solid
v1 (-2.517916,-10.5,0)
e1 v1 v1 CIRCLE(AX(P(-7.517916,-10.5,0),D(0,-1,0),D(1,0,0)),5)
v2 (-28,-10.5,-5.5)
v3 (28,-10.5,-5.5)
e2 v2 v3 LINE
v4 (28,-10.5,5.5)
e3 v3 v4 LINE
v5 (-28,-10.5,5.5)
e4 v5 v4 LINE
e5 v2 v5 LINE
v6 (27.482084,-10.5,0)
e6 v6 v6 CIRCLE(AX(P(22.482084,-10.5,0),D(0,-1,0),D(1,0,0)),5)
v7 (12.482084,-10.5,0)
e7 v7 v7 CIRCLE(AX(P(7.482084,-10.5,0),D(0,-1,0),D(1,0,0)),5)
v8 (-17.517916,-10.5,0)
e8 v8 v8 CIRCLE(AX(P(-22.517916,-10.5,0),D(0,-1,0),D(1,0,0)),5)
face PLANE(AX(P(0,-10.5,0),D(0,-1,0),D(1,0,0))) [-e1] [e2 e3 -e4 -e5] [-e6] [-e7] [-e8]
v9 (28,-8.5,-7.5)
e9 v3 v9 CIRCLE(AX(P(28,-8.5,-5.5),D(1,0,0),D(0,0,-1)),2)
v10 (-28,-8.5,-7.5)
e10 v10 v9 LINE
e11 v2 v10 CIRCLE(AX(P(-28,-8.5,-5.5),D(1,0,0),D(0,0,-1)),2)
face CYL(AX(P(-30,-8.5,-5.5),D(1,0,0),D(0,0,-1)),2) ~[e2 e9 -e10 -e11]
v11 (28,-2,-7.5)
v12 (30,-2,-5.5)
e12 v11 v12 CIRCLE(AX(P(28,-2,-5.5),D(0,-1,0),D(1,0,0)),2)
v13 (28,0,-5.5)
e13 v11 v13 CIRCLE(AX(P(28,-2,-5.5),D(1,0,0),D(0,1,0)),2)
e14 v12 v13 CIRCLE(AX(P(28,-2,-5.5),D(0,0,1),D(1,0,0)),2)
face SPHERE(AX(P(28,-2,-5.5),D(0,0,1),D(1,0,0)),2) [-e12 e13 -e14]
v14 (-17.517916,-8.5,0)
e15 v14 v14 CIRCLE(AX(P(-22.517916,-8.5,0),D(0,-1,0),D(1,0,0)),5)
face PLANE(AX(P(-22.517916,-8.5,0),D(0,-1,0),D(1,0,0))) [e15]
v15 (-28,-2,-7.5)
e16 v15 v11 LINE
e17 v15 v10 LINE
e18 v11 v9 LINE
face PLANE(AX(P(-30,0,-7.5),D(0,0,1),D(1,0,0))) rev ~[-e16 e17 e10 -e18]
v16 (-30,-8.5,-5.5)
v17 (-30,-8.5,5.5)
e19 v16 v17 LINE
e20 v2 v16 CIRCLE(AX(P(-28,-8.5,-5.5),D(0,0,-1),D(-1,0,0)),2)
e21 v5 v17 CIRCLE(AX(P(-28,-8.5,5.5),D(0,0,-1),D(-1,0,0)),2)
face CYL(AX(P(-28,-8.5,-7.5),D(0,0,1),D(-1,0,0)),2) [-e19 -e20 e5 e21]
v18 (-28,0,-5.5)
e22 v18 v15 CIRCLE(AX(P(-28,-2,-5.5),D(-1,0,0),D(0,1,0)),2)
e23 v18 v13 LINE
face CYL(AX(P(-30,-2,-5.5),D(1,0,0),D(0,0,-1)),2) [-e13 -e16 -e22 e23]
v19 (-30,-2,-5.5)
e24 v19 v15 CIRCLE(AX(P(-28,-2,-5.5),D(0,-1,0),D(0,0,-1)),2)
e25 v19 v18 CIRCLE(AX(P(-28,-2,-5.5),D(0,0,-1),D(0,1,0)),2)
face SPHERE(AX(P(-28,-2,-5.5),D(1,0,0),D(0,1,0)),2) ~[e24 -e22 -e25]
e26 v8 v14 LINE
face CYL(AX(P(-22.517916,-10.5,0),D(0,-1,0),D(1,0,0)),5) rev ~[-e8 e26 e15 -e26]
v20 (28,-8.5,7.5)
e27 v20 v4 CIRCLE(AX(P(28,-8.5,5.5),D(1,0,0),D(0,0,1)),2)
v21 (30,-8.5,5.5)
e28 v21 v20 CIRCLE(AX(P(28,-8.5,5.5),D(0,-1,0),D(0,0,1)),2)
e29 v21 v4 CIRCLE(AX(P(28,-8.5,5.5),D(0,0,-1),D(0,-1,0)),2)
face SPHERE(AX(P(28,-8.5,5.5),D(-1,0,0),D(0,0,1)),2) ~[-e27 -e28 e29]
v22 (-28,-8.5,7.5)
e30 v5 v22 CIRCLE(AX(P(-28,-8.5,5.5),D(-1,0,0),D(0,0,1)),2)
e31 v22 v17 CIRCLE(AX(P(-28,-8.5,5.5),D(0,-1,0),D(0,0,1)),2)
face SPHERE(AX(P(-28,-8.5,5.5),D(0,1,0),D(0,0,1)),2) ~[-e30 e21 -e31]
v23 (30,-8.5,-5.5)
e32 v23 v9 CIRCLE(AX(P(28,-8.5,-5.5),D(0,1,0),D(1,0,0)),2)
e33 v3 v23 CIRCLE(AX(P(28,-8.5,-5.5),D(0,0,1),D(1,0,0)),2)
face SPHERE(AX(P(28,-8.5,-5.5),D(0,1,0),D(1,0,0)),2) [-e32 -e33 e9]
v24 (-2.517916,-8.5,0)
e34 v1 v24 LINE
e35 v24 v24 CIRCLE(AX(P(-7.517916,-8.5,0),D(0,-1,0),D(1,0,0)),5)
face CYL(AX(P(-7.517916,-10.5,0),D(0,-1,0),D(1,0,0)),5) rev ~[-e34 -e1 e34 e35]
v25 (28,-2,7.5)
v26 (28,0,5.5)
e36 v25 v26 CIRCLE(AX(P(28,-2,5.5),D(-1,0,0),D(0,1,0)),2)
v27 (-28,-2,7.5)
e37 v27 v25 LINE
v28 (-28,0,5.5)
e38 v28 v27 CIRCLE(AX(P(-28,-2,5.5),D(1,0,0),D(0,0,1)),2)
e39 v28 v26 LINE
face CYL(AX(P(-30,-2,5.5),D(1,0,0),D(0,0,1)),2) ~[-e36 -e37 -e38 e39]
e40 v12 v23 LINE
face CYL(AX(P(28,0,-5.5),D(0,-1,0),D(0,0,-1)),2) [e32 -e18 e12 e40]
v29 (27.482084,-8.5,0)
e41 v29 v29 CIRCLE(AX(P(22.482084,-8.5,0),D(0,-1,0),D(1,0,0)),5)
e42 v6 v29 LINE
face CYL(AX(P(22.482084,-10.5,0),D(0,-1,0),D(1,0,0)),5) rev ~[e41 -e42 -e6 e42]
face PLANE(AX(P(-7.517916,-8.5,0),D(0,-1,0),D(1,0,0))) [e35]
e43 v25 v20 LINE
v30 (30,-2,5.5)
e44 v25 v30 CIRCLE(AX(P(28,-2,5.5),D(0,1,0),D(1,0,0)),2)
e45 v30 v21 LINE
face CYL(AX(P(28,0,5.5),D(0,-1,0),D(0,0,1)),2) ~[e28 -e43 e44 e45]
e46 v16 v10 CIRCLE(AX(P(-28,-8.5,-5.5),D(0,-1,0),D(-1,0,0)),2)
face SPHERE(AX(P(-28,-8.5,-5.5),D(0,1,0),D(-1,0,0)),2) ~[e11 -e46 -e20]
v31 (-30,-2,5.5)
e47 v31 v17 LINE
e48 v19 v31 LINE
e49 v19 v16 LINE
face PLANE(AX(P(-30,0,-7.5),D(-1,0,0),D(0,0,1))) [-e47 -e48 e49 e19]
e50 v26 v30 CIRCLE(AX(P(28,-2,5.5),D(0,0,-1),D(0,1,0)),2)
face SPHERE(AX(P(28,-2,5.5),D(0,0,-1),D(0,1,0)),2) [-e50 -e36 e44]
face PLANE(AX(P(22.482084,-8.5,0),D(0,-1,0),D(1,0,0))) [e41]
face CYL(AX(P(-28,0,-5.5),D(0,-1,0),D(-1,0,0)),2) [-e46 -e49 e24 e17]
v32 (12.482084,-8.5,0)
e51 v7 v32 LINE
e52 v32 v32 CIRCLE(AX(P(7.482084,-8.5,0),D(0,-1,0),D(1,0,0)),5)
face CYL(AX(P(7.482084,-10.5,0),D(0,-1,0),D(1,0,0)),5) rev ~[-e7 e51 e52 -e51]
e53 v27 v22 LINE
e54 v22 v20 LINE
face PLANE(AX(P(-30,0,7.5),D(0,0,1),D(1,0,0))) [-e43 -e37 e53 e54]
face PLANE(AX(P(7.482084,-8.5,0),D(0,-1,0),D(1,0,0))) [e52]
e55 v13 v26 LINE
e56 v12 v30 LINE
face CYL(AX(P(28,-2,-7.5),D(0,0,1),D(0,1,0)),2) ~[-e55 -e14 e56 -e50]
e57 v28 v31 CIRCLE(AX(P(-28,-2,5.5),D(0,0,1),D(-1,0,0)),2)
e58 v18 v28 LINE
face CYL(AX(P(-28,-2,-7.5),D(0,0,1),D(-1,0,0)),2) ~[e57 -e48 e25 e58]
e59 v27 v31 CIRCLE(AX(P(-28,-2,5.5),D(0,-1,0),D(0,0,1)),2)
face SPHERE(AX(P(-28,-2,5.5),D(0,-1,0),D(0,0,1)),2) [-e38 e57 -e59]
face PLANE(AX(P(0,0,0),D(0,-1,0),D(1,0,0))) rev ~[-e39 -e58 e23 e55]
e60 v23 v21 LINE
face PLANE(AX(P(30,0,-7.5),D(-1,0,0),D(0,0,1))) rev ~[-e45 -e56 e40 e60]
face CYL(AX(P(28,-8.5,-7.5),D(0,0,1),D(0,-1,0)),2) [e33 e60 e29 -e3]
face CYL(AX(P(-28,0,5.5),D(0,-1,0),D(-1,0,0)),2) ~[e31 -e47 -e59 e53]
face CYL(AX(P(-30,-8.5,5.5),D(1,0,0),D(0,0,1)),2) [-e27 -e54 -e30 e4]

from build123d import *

# Parameters (mm, degrees)
F0_W     = 60
F0_H     = 15
F1_DEPTH = 10.5
F2_R     = 5
F3_DEPTH = 2
F4_R     = 2


# Not quite as in the source:
# - a feature names something its author has since deleted; it is built from what else it names


with BuildPart() as f1:
    # F0 (on Front) → F1 (new body)
    with BuildSketch(Plane.XZ):
        Rectangle(F0_W, F0_H)
    extrude(amount=F1_DEPTH)

    # F2 (on face) → F3 (cut)
    with BuildSketch(Plane.XZ.offset(10.5)):
        with Locations((-22.5179158151, 0)):
            Circle(F2_R)
        with Locations((-7.5179158151, 0)):
            Circle(F2_R)
        with Locations((7.4820841849, 0)):
            Circle(F2_R)
        with Locations((22.4820841849, 0)):
            Circle(F2_R)
    extrude(amount=-F3_DEPTH, mode=Mode.SUBTRACT)

    # F4
    f4_edges = [f1.edges().sort_by_distance(p)[0] for p in [
        (-30, -5.25, 7.5),
        (30, 0, 0),
        (0, -10.5, 7.5),
        (0, 0, 7.5),
        (30, -5.25, 7.5),
        (30, -5.25, -7.5),
        (30, -10.5, 0),
        (0, 0, -7.5),
        (-30, 0, 0),
        (-30, -5.25, -7.5),
        (-30, -10.5, 0),
        (0, -10.5, -7.5),
    ]]
    fillet(f4_edges, radius=F4_R)


solid = f1.part
